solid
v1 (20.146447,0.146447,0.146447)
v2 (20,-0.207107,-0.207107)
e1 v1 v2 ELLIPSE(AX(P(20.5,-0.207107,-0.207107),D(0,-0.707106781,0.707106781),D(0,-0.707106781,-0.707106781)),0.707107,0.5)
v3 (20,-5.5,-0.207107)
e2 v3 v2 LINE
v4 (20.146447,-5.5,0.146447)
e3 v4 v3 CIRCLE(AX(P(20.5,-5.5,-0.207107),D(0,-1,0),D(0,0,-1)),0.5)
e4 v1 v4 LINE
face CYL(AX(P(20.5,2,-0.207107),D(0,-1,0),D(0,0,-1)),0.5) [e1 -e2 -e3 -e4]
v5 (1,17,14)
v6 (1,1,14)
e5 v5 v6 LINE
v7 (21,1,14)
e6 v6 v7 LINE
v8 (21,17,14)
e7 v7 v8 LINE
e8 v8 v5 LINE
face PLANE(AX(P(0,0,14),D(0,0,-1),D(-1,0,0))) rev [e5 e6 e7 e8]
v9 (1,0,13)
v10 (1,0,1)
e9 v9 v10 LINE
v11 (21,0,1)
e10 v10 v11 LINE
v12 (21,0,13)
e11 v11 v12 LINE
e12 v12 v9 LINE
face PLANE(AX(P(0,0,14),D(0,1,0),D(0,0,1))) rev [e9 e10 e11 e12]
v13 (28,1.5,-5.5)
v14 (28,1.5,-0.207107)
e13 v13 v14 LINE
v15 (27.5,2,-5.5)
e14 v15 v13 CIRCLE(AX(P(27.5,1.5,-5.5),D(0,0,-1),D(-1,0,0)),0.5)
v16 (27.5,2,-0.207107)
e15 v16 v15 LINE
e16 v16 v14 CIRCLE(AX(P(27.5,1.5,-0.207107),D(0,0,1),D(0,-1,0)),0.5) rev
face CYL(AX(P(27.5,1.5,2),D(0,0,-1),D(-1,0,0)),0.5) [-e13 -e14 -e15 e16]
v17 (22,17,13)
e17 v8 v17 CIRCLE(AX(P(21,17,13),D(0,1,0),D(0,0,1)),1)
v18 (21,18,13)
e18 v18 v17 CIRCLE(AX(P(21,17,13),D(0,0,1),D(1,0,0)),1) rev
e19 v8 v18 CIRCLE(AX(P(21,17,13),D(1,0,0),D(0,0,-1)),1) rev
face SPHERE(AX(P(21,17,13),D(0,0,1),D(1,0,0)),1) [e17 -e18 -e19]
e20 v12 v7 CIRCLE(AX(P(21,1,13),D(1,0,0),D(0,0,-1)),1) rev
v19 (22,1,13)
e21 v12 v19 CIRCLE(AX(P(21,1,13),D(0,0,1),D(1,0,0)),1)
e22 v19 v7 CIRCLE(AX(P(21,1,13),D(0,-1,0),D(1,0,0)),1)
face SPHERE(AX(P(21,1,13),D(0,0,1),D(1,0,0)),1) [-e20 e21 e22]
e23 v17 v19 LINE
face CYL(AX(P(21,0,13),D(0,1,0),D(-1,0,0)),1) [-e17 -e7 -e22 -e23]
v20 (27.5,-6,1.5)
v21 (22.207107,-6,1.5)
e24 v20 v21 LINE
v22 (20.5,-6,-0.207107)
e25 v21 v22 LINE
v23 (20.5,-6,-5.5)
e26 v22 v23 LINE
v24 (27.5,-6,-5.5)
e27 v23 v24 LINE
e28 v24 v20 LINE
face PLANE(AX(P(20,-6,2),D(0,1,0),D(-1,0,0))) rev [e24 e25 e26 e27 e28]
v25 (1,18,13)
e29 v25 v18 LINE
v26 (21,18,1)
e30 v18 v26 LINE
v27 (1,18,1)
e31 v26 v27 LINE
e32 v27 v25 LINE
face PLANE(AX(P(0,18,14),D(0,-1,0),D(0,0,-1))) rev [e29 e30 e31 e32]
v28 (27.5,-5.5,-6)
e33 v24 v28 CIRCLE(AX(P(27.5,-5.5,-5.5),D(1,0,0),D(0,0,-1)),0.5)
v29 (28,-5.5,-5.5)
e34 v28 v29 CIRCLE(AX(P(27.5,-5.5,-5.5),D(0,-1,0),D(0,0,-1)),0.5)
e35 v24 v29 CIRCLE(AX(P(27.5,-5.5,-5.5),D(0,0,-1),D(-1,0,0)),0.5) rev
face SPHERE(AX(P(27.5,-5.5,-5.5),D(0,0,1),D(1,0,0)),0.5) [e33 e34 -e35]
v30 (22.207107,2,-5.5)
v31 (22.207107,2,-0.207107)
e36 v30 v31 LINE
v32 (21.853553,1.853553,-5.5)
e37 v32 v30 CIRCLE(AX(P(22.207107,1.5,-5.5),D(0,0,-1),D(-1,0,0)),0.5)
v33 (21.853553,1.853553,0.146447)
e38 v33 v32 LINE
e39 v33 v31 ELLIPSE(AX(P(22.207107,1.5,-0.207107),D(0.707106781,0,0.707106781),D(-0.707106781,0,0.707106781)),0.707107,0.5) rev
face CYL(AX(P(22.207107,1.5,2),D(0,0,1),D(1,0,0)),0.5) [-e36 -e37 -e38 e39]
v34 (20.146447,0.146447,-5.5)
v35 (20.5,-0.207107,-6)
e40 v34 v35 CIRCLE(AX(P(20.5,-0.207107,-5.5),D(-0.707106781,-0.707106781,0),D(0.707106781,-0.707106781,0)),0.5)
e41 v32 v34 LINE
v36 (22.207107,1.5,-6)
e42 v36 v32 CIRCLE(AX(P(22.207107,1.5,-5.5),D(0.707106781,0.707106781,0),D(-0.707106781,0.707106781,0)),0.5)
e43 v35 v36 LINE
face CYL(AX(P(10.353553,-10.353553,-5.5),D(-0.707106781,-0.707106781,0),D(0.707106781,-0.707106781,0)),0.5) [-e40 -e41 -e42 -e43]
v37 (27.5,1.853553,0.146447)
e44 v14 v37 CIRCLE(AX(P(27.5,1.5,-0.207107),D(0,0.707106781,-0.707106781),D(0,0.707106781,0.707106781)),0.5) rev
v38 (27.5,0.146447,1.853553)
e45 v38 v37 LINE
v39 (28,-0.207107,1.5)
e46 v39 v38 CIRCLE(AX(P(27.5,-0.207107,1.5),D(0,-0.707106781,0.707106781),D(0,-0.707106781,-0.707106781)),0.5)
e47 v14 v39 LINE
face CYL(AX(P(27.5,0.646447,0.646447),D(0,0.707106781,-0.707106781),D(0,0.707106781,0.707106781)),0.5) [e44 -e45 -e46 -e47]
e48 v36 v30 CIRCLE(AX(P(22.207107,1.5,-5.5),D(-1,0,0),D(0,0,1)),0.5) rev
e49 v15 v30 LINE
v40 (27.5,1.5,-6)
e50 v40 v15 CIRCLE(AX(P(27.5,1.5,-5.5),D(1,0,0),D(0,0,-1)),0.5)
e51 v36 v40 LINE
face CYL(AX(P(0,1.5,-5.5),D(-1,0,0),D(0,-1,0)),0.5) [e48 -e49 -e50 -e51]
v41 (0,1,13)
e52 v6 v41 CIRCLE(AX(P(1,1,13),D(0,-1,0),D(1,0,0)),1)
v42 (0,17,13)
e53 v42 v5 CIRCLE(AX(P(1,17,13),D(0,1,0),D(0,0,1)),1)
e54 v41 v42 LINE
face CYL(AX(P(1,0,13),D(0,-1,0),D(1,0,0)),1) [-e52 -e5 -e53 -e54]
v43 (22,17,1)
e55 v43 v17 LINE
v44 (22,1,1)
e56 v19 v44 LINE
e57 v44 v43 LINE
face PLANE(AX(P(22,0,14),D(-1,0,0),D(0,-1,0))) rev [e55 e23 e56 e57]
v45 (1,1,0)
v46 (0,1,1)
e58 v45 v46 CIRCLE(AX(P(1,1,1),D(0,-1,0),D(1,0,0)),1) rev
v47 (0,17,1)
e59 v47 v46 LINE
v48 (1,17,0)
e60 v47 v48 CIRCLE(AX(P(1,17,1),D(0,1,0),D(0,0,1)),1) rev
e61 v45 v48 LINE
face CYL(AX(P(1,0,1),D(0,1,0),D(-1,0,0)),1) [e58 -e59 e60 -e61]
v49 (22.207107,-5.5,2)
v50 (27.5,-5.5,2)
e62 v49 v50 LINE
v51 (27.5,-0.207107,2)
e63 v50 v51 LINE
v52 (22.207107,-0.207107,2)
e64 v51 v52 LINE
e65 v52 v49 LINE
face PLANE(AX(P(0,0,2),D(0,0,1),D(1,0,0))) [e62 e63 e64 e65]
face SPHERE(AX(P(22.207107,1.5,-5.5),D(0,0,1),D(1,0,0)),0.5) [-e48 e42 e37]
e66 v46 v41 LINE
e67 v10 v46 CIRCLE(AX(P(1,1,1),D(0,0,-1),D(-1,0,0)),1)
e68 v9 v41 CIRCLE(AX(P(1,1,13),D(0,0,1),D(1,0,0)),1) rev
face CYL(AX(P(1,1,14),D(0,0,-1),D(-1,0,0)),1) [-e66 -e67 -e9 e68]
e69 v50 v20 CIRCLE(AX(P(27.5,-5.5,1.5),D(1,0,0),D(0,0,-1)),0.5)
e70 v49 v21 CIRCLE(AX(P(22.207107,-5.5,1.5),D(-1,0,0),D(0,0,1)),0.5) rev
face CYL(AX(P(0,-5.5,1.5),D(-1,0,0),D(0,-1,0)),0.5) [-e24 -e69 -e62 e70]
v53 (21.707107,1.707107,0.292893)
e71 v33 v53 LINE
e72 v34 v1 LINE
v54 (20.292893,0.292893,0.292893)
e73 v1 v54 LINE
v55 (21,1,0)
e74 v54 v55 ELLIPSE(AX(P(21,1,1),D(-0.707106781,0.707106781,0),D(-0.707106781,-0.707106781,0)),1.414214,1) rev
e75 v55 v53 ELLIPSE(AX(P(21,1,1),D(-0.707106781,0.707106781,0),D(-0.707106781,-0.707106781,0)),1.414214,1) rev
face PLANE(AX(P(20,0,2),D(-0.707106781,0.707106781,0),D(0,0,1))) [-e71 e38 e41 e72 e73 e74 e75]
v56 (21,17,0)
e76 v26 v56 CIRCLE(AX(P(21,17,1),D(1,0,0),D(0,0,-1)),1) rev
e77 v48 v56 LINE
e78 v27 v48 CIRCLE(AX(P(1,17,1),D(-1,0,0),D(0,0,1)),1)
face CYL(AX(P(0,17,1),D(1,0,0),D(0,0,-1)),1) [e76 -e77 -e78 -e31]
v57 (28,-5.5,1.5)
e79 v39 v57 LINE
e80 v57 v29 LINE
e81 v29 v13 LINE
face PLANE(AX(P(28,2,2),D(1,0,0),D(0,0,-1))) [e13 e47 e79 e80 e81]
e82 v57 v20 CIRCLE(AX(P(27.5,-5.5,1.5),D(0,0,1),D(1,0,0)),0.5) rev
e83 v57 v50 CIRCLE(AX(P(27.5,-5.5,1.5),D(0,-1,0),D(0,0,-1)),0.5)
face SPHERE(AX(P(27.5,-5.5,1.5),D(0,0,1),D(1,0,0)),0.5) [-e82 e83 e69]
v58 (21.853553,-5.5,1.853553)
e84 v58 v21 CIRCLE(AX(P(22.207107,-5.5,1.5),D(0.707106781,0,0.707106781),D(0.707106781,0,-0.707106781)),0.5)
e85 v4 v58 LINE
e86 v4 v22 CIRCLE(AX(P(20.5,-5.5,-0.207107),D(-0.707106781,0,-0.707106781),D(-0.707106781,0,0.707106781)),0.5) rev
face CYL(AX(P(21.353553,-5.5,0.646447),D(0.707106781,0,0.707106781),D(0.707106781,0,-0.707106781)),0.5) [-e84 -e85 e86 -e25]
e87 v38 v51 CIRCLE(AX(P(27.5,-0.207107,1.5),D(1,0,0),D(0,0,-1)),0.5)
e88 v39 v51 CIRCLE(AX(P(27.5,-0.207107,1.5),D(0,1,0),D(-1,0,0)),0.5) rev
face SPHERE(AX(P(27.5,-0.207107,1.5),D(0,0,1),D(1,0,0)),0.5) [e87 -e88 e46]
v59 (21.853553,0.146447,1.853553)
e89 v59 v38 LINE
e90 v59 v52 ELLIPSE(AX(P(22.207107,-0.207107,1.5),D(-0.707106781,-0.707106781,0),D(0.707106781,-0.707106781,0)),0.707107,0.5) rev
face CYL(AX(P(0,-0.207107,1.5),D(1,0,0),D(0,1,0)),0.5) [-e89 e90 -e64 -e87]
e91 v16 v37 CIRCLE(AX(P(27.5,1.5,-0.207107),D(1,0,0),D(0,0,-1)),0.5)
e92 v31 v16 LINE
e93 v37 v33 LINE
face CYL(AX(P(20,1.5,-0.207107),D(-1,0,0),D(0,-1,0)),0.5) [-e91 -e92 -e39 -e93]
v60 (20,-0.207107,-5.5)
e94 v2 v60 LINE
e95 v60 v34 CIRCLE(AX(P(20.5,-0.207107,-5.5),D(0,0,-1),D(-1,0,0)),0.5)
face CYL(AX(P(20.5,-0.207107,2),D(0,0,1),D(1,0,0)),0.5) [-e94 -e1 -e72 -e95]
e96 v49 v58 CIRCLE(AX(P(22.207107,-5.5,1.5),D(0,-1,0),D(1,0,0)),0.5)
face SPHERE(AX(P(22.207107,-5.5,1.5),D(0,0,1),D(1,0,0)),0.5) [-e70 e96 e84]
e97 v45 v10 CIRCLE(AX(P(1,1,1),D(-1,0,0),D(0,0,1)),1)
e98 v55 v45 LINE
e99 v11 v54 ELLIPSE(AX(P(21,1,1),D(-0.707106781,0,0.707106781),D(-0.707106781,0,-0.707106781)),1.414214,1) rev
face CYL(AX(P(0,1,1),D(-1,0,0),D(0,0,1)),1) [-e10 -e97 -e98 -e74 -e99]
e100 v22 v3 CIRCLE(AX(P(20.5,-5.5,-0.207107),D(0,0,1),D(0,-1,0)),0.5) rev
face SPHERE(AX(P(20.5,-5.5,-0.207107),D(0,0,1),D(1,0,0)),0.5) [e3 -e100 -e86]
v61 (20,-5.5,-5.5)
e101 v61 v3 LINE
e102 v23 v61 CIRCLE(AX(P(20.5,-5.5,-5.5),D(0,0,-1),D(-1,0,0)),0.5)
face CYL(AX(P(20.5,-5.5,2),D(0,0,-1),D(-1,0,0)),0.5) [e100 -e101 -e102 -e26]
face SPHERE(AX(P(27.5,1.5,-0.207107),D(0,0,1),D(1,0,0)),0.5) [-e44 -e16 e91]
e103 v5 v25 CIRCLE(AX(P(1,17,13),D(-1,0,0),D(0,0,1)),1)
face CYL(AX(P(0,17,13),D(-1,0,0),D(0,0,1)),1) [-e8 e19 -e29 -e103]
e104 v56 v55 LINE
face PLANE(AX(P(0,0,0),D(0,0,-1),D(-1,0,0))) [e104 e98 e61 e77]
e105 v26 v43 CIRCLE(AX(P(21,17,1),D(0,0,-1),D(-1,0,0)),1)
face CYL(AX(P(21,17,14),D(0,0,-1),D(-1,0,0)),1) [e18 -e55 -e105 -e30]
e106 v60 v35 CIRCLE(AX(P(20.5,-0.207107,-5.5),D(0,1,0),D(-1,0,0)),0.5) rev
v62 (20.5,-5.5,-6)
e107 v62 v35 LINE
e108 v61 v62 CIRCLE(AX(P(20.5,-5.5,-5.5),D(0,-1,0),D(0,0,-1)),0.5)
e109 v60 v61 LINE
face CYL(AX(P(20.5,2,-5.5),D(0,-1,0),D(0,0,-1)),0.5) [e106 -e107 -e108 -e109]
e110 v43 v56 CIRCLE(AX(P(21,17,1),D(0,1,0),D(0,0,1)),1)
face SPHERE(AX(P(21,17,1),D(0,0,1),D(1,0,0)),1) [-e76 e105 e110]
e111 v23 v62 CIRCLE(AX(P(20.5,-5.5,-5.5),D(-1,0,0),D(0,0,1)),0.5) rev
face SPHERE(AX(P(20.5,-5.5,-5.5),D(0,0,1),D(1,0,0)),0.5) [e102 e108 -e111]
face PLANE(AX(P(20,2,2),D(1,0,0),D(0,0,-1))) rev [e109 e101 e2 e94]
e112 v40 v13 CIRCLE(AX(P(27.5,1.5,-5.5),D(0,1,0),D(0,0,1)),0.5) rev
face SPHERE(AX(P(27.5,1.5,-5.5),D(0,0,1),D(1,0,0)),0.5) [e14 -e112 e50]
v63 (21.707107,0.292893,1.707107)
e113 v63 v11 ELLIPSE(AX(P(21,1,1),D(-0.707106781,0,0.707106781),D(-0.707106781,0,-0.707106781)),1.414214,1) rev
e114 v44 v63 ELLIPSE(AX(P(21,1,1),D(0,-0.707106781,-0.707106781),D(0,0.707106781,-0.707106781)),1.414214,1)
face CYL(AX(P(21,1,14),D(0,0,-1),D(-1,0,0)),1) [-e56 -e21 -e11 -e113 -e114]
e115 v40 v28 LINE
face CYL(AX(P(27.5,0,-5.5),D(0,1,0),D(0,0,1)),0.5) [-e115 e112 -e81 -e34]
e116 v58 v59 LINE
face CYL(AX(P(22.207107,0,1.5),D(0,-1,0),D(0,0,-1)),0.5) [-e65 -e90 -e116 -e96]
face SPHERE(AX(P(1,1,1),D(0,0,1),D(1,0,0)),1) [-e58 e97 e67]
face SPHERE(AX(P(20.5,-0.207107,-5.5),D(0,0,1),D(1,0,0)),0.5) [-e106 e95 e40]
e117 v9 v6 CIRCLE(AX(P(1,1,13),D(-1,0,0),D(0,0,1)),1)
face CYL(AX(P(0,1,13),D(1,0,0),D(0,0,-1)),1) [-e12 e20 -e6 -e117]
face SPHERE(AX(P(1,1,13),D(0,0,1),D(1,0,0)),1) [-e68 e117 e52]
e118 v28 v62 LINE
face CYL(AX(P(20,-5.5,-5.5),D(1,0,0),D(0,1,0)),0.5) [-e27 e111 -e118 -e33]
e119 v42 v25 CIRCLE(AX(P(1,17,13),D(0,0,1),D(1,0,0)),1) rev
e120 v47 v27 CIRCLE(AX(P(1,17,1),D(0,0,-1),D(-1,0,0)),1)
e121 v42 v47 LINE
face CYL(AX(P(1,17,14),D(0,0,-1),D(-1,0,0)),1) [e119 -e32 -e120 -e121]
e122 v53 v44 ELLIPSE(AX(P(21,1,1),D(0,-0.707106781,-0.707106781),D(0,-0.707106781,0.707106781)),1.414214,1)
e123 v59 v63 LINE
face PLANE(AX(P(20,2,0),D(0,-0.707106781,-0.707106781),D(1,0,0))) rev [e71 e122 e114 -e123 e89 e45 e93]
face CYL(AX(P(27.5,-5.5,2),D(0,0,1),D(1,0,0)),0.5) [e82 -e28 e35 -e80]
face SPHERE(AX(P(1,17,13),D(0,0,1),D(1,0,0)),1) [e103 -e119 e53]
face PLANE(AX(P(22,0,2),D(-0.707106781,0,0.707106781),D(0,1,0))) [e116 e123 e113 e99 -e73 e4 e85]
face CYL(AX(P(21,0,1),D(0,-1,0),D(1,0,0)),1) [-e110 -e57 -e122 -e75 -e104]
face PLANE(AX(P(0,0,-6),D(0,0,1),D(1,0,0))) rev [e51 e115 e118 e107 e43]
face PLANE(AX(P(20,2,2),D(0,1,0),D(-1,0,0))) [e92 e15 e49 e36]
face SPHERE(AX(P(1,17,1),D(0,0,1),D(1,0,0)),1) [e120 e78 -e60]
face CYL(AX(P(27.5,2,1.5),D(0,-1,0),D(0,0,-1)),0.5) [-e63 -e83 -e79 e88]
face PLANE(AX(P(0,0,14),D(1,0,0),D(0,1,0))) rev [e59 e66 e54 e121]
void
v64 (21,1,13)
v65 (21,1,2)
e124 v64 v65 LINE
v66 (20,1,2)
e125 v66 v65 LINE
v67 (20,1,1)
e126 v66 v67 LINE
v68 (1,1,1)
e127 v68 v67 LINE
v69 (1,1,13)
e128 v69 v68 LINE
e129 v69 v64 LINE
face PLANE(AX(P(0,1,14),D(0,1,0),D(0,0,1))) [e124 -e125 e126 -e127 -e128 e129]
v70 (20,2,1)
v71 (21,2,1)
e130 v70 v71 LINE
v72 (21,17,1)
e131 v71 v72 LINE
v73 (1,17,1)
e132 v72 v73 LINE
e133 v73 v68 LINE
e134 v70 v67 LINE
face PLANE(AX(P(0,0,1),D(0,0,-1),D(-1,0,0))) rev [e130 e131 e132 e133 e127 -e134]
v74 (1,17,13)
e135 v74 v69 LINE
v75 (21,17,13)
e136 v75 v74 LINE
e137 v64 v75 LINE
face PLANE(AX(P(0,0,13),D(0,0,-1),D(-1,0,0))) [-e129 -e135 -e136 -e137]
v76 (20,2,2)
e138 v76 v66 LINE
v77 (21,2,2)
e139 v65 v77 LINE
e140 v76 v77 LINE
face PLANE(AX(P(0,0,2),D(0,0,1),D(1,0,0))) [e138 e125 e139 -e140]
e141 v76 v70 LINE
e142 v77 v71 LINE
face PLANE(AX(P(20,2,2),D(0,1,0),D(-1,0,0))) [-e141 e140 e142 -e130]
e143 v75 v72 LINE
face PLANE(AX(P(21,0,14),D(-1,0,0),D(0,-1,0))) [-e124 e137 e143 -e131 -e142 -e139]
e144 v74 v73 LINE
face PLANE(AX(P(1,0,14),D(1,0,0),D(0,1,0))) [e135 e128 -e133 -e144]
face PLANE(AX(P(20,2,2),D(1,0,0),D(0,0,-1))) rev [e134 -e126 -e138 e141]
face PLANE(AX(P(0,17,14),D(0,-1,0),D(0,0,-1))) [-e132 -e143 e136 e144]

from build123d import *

# Parameters (mm, degrees)
SKETCH1_W                = 22
SKETCH1_H                = 18
BOSS_EXTRUDE1_DEPTH      = 14
SHELL1_T                 = 1
BOSS_EXTRUDE3_DEPTH      = 6
BOSS_EXTRUDE3_DEPTH_BACK = 2
SKETCH2_W                = 8
SKETCH2_H                = 8
CHAMFER2_SIZE            = 2
FILLET1_R                = 1
FILLET2_R                = 0.5


with BuildPart() as part:
    # Sketch1 → Boss-Extrude1 (new body)
    with BuildSketch(Plane.XY):
        with Locations((11, 9)):
            Rectangle(SKETCH1_W, SKETCH1_H)
    extrude(amount=BOSS_EXTRUDE1_DEPTH)

    # Shell1 (no face opened: a closed hollow body)
    add(offset(amount=-SHELL1_T, mode=Mode.PRIVATE), mode=Mode.SUBTRACT)

    # Sketch2 → Boss-Extrude3 (add, two sides: drawn at the far end of the back side and taken through both)
    with BuildSketch(Plane(origin=(0, 0, 0), x_dir=(-1, 0, 0), z_dir=(0, 0, -1)).offset(-BOSS_EXTRUDE3_DEPTH_BACK)):
        with Locations((-24, -2)):
            Rectangle(SKETCH2_W, SKETCH2_H)
    extrude(amount=BOSS_EXTRUDE3_DEPTH + BOSS_EXTRUDE3_DEPTH_BACK)

    # Chamfer2
    chamfer2_edges = [part.edges().sort_by_distance(p)[0] for p in [
        (20, -3, 2),
        (20, 2, -3),
        (25, 2, 2),
    ]]
    chamfer(chamfer2_edges, length=CHAMFER2_SIZE)

    # Fillet1
    # the kernel refuses this fillet: 1 mm, written as the material it takes off along each edge
    with BuildSketch(Plane(origin=(1, 17, 1), x_dir=(0, 1, 0), z_dir=(0, 0, -1))) as fillet1_piece_1_section:
        Polygon((0, 0), (FILLET1_R, 0), (FILLET1_R, -FILLET1_R), (0, -FILLET1_R), align=None)
    fillet1_piece_1 = extrude(amount=FILLET1_R, mode=Mode.PRIVATE)
    fillet1_piece_1 = fillet1_piece_1 - Plane(origin=(1, 17, 1), x_dir=(0.7071067811865476, -0.7071067811865474, 0), z_dir=(0, 0, -1)) * Sphere(FILLET1_R, mode=Mode.PRIVATE)
    add(fillet1_piece_1, mode=Mode.SUBTRACT)
    with BuildSketch(Plane(origin=(1, 1, 1), x_dir=(0, 0, -1), z_dir=(0, -1, 0))) as fillet1_piece_2_section:
        Polygon((0, 0), (FILLET1_R, 0), (FILLET1_R, -FILLET1_R), (0, -FILLET1_R), align=None)
    fillet1_piece_2 = extrude(amount=FILLET1_R, mode=Mode.PRIVATE)
    fillet1_piece_2 = fillet1_piece_2 - Plane(origin=(1, 1, 1), x_dir=(0.7071067811865475, 0, 0.7071067811865475), z_dir=(0, -1, 0)) * Sphere(FILLET1_R, mode=Mode.PRIVATE)
    add(fillet1_piece_2, mode=Mode.SUBTRACT)
    with BuildSketch(Plane(origin=(21, 17, 1), x_dir=(0, 0, -1), z_dir=(0, 1, 0))) as fillet1_piece_3_section:
        Polygon((0, 0), (FILLET1_R, 0), (FILLET1_R, -FILLET1_R), (0, -FILLET1_R), align=None)
    fillet1_piece_3 = extrude(amount=FILLET1_R, mode=Mode.PRIVATE)
    fillet1_piece_3 = fillet1_piece_3 - Plane(origin=(21, 17, 1), x_dir=(-0.7071067811865475, 0, 0.7071067811865475), z_dir=(0, 1, 0)) * Sphere(FILLET1_R, mode=Mode.PRIVATE)
    add(fillet1_piece_3, mode=Mode.SUBTRACT)
    with BuildSketch(Plane(origin=(1, 1, 13), x_dir=(-1, 0, 0), z_dir=(0, -1, 0))) as fillet1_piece_4_section:
        Polygon((0, 0), (FILLET1_R, 0), (FILLET1_R, -FILLET1_R), (0, -FILLET1_R), align=None)
    fillet1_piece_4 = extrude(amount=FILLET1_R, mode=Mode.PRIVATE)
    fillet1_piece_4 = fillet1_piece_4 - Plane(origin=(1, 1, 13), x_dir=(0.7071067811865475, 0, -0.7071067811865475), z_dir=(0, -1, 0)) * Sphere(FILLET1_R, mode=Mode.PRIVATE)
    add(fillet1_piece_4, mode=Mode.SUBTRACT)
    with BuildSketch(Plane(origin=(21, 1, 13), x_dir=(1, 0, 0), z_dir=(0, -1, 0))) as fillet1_piece_5_section:
        Polygon((0, 0), (FILLET1_R, 0), (FILLET1_R, FILLET1_R), (0, FILLET1_R), align=None)
    fillet1_piece_5 = extrude(amount=FILLET1_R, mode=Mode.PRIVATE)
    fillet1_piece_5 = fillet1_piece_5 - Plane(origin=(21, 1, 13), x_dir=(-0.7071067811865475, 0, -0.7071067811865475), z_dir=(0, -1, 0)) * Sphere(FILLET1_R, mode=Mode.PRIVATE)
    add(fillet1_piece_5, mode=Mode.SUBTRACT)
    with BuildSketch(Plane(origin=(21, 17, 13), x_dir=(1, 0, 0), z_dir=(0, 1, 0))) as fillet1_piece_6_section:
        Polygon((0, 0), (FILLET1_R, 0), (FILLET1_R, -FILLET1_R), (0, -FILLET1_R), align=None)
    fillet1_piece_6 = extrude(amount=FILLET1_R, mode=Mode.PRIVATE)
    fillet1_piece_6 = fillet1_piece_6 - Plane(origin=(21, 17, 13), x_dir=(-0.7071067811865475, 0, -0.7071067811865475), z_dir=(0, 1, 0)) * Sphere(FILLET1_R, mode=Mode.PRIVATE)
    add(fillet1_piece_6, mode=Mode.SUBTRACT)
    with BuildSketch(Plane(origin=(1, 17, 13), x_dir=(-1, 0, 0), z_dir=(0, 1, 0))) as fillet1_piece_7_section:
        Polygon((0, 0), (FILLET1_R, 0), (FILLET1_R, FILLET1_R), (0, FILLET1_R), align=None)
    fillet1_piece_7 = extrude(amount=FILLET1_R, mode=Mode.PRIVATE)
    fillet1_piece_7 = fillet1_piece_7 - Plane(origin=(1, 17, 13), x_dir=(0.7071067811865475, 0, -0.7071067811865475), z_dir=(0, 1, 0)) * Sphere(FILLET1_R, mode=Mode.PRIVATE)
    add(fillet1_piece_7, mode=Mode.SUBTRACT)
    with BuildSketch(Plane(origin=(0, 17, 0), x_dir=(1, 0, 0), z_dir=(0, -1, 0)), Plane(origin=(22, 1, 14), x_dir=(0, 0, -1), z_dir=(0, 1, 0)), Plane(origin=(0, 17, 14), x_dir=(0, 0, -1), z_dir=(0, -1, 0))) as fillet1_piece_8:
        with BuildLine():
            CenterArc((FILLET1_R, FILLET1_R), FILLET1_R, 180, 90)
            Line((0, FILLET1_R), (0, 0))
            Line((0, 0), (FILLET1_R, 0))
        make_face()
    extrude(amount=16, mode=Mode.SUBTRACT)
    with BuildSketch(Plane(origin=(1, 0, 0), x_dir=(0, 0, 1), z_dir=(1, 0, 0))) as fillet1_piece_9_section:
        with BuildLine():
            CenterArc((FILLET1_R, -FILLET1_R), FILLET1_R, 90, 90)
            Line((0, -FILLET1_R), (0, 0))
            Line((0, 0), (FILLET1_R, 0))
        make_face()
    fillet1_piece_9 = extrude(amount=21.5, mode=Mode.PRIVATE)
    fillet1_piece_9 = split(fillet1_piece_9, bisect_by=Plane(origin=(15.381840504, 0.226418621, -4.618159496), z_dir=(-0.7071067811865476, 0, 0.7071067811865476)), keep=Keep.TOP, mode=Mode.PRIVATE)
    fillet1_piece_9 = split(fillet1_piece_9, bisect_by=Plane(origin=(15.381840504, -4.618159496, 0.226418621), z_dir=(-0.7071067811865476, 0.7071067811865476, 0)), keep=Keep.TOP, mode=Mode.PRIVATE)
    add(fillet1_piece_9, mode=Mode.SUBTRACT)
    with BuildSketch(Plane(origin=(1, 0, 0), x_dir=(0, 0, 1), z_dir=(1, 0, 0))) as fillet1_piece_10_section:
        with BuildLine():
            CenterArc((FILLET1_R, -FILLET1_R), FILLET1_R, 90, 90)
            Line((0, -FILLET1_R), (0, 0))
            Line((0, 0), (FILLET1_R, 0))
        make_face()
    fillet1_piece_10 = extrude(amount=21.5, mode=Mode.PRIVATE)
    fillet1_piece_10 = split(fillet1_piece_10, bisect_by=Plane(origin=(20.16446835, 0.528927527, 0.16446835), z_dir=(0.7071067811865476, 0, -0.7071067811865476)), keep=Keep.TOP, mode=Mode.PRIVATE)
    fillet1_piece_10 = split(fillet1_piece_10, bisect_by=Plane(origin=(20.407441135, 0.407441135, 0.042981958), z_dir=(-0.7071067811865476, 0.7071067811865476, 0)), keep=Keep.TOP, mode=Mode.PRIVATE)
    add(fillet1_piece_10, mode=Mode.SUBTRACT)
    with BuildSketch(Plane(origin=(1, 0, 0), x_dir=(0, 0, 1), z_dir=(1, 0, 0))) as fillet1_piece_11_section:
        with BuildLine():
            CenterArc((FILLET1_R, -FILLET1_R), FILLET1_R, 90, 90)
            Line((0, -FILLET1_R), (0, 0))
            Line((0, 0), (FILLET1_R, 0))
        make_face()
    fillet1_piece_11 = extrude(amount=21.5, mode=Mode.PRIVATE)
    fillet1_piece_11 = split(fillet1_piece_11, bisect_by=Plane(origin=(20.407441135, 0.042981958, 0.407441135), z_dir=(-0.7071067811865476, 0, 0.7071067811865476)), keep=Keep.TOP, mode=Mode.PRIVATE)
    fillet1_piece_11 = split(fillet1_piece_11, bisect_by=Plane(origin=(20.16446835, 0.16446835, 0.528927527), z_dir=(0.7071067811865476, -0.7071067811865476, 0)), keep=Keep.TOP, mode=Mode.PRIVATE)
    add(fillet1_piece_11, mode=Mode.SUBTRACT)
    with BuildSketch(Plane(origin=(22, -0.5, 0), x_dir=(-1, 0, 0), z_dir=(0, 1, 0))) as fillet1_piece_12_section:
        with BuildLine():
            CenterArc((FILLET1_R, FILLET1_R), FILLET1_R, 180, 90)
            Line((0, FILLET1_R), (0, 0))
            Line((0, 0), (FILLET1_R, 0))
        make_face()
    fillet1_piece_12 = extrude(amount=17.5, mode=Mode.PRIVATE)
    fillet1_piece_12 = split(fillet1_piece_12, bisect_by=Plane(origin=(21.83553165, 1.83553165, 0.528927527), z_dir=(0.7071067811865476, -0.7071067811865476, 0)), keep=Keep.TOP, mode=Mode.PRIVATE)
    fillet1_piece_12 = split(fillet1_piece_12, bisect_by=Plane(origin=(21.957018042, 1.592558865, 0.407441135), z_dir=(0, 0.7071067811865476, 0.7071067811865476)), keep=Keep.TOP, mode=Mode.PRIVATE)
    add(fillet1_piece_12, mode=Mode.SUBTRACT)
    with BuildSketch(Plane(origin=(22, -0.5, 0), x_dir=(-1, 0, 0), z_dir=(0, 1, 0))) as fillet1_piece_13_section:
        with BuildLine():
            CenterArc((FILLET1_R, FILLET1_R), FILLET1_R, 180, 90)
            Line((0, FILLET1_R), (0, 0))
            Line((0, 0), (FILLET1_R, 0))
        make_face()
    fillet1_piece_13 = extrude(amount=17.5, mode=Mode.PRIVATE)
    fillet1_piece_13 = split(fillet1_piece_13, bisect_by=Plane(origin=(21.592558865, 1.592558865, 0.042981958), z_dir=(-0.7071067811865476, 0.7071067811865476, 0)), keep=Keep.TOP, mode=Mode.PRIVATE)
    fillet1_piece_13 = split(fillet1_piece_13, bisect_by=Plane(origin=(21.471072473, 1.83553165, 0.16446835), z_dir=(0, -0.7071067811865476, -0.7071067811865476)), keep=Keep.TOP, mode=Mode.PRIVATE)
    add(fillet1_piece_13, mode=Mode.SUBTRACT)
    with BuildSketch(Plane(origin=(22, -0.5, 0), x_dir=(-1, 0, 0), z_dir=(0, 1, 0))) as fillet1_piece_14_section:
        with BuildLine():
            CenterArc((FILLET1_R, FILLET1_R), FILLET1_R, 180, 90)
            Line((0, FILLET1_R), (0, 0))
            Line((0, 0), (FILLET1_R, 0))
        make_face()
    fillet1_piece_14 = extrude(amount=17.5, mode=Mode.PRIVATE)
    fillet1_piece_14 = split(fillet1_piece_14, bisect_by=Plane(origin=(25.618138272, 5.618138272, 0.226424858), z_dir=(-0.7071067811865476, 0.7071067811865476, 0)), keep=Keep.TOP, mode=Mode.PRIVATE)
    fillet1_piece_14 = split(fillet1_piece_14, bisect_by=Plane(origin=(21.773575142, 5.618138272, -3.618138272), z_dir=(0, 0.7071067811865476, 0.7071067811865476)), keep=Keep.TOP, mode=Mode.PRIVATE)
    add(fillet1_piece_14, mode=Mode.SUBTRACT)
    with BuildSketch(Plane(origin=(21, 18, 0), x_dir=(0, -1, 0), z_dir=(-1, 0, 0)), Plane(origin=(1, 0, 14), x_dir=(0, 0, -1), z_dir=(1, 0, 0))) as fillet1_piece_15:
        with BuildLine():
            CenterArc((FILLET1_R, FILLET1_R), FILLET1_R, 180, 90)
            Line((0, FILLET1_R), (0, 0))
            Line((0, 0), (FILLET1_R, 0))
        make_face()
    extrude(amount=20, mode=Mode.SUBTRACT)
    with BuildSketch(Plane(origin=(21, 18, 14), x_dir=(0, -1, 0), z_dir=(-1, 0, 0))) as fillet1_piece_16:
        with BuildLine():
            CenterArc((FILLET1_R, -FILLET1_R), FILLET1_R, 90, 90)
            Line((0, -FILLET1_R), (0, 0))
            Line((0, 0), (FILLET1_R, 0))
        make_face()
    extrude(amount=20, mode=Mode.SUBTRACT)
    with BuildSketch(Plane(origin=(0, 18, 1), x_dir=(0, -1, 0), z_dir=(0, 0, 1)), Plane(origin=(0, 0, 1), x_dir=(1, 0, 0), z_dir=(0, 0, 1))) as fillet1_piece_17:
        with BuildLine():
            CenterArc((FILLET1_R, FILLET1_R), FILLET1_R, 180, 90)
            Line((0, FILLET1_R), (0, 0))
            Line((0, 0), (FILLET1_R, 0))
        make_face()
    extrude(amount=12, mode=Mode.SUBTRACT)
    with BuildSketch(Plane(origin=(22, 18, 1), x_dir=(0, -1, 0), z_dir=(0, 0, 1))) as fillet1_piece_18:
        with BuildLine():
            CenterArc((FILLET1_R, -FILLET1_R), FILLET1_R, 90, 90)
            Line((0, -FILLET1_R), (0, 0))
            Line((0, 0), (FILLET1_R, 0))
        make_face()
    extrude(amount=12, mode=Mode.SUBTRACT)
    with BuildSketch(Plane(origin=(22, 0, -0.5), x_dir=(-1, 0, 0), z_dir=(0, 0, 1))) as fillet1_piece_19_section:
        with BuildLine():
            CenterArc((FILLET1_R, -FILLET1_R), FILLET1_R, 90, 90)
            Line((0, -FILLET1_R), (0, 0))
            Line((0, 0), (FILLET1_R, 0))
        make_face()
    fillet1_piece_19 = extrude(amount=13.5, mode=Mode.PRIVATE)
    fillet1_piece_19 = split(fillet1_piece_19, bisect_by=Plane(origin=(21.83553165, 0.528927527, 1.83553165), z_dir=(0.7071067811865476, 0, -0.7071067811865476)), keep=Keep.TOP, mode=Mode.PRIVATE)
    fillet1_piece_19 = split(fillet1_piece_19, bisect_by=Plane(origin=(21.957018042, 0.407441135, 1.592558865), z_dir=(0, 0.7071067811865476, 0.7071067811865476)), keep=Keep.TOP, mode=Mode.PRIVATE)
    add(fillet1_piece_19, mode=Mode.SUBTRACT)
    with BuildSketch(Plane(origin=(22, 0, -0.5), x_dir=(-1, 0, 0), z_dir=(0, 0, 1))) as fillet1_piece_20_section:
        with BuildLine():
            CenterArc((FILLET1_R, -FILLET1_R), FILLET1_R, 90, 90)
            Line((0, -FILLET1_R), (0, 0))
            Line((0, 0), (FILLET1_R, 0))
        make_face()
    fillet1_piece_20 = extrude(amount=13.5, mode=Mode.PRIVATE)
    fillet1_piece_20 = split(fillet1_piece_20, bisect_by=Plane(origin=(21.592558865, 0.042981958, 1.592558865), z_dir=(-0.7071067811865476, 0, 0.7071067811865476)), keep=Keep.TOP, mode=Mode.PRIVATE)
    fillet1_piece_20 = split(fillet1_piece_20, bisect_by=Plane(origin=(21.471072473, 0.16446835, 1.83553165), z_dir=(0, -0.7071067811865476, -0.7071067811865476)), keep=Keep.TOP, mode=Mode.PRIVATE)
    add(fillet1_piece_20, mode=Mode.SUBTRACT)
    with BuildSketch(Plane(origin=(22, 0, -0.5), x_dir=(-1, 0, 0), z_dir=(0, 0, 1))) as fillet1_piece_21_section:
        with BuildLine():
            CenterArc((FILLET1_R, -FILLET1_R), FILLET1_R, 90, 90)
            Line((0, -FILLET1_R), (0, 0))
            Line((0, 0), (FILLET1_R, 0))
        make_face()
    fillet1_piece_21 = extrude(amount=13.5, mode=Mode.PRIVATE)
    fillet1_piece_21 = split(fillet1_piece_21, bisect_by=Plane(origin=(24.618101716, 0.226435602, 4.618101716), z_dir=(-0.7071067811865476, 0, 0.7071067811865476)), keep=Keep.TOP, mode=Mode.PRIVATE)
    fillet1_piece_21 = split(fillet1_piece_21, bisect_by=Plane(origin=(21.773564398, -2.618101716, 4.618101716), z_dir=(0, 0.7071067811865476, 0.7071067811865476)), keep=Keep.TOP, mode=Mode.PRIVATE)
    add(fillet1_piece_21, mode=Mode.SUBTRACT)

    # Fillet2
    fillet2_edges = [part.edges().sort_by_distance(p)[0] for p in [
        (24, -6, -6),
        (28, -6, -2),
        (28, -2, -6),
        (28, 2, -3),
        (25, 2, -6),
        (22, 2, -3),
        (25, 2, 0),
        (28, -3, 2),
        (28, 1, 1),
        (25, -6, 2),
        (22, -3, 2),
        (25, 0, 2),
        (20, -3, -6),
        (20, -6, -3),
        (20, -3, 0),
        (20, 0, -3),
        (21, 1, -6),
        (21, -6, 1),
    ]]
    fillet(fillet2_edges, radius=FILLET2_R)


solid = part.part
